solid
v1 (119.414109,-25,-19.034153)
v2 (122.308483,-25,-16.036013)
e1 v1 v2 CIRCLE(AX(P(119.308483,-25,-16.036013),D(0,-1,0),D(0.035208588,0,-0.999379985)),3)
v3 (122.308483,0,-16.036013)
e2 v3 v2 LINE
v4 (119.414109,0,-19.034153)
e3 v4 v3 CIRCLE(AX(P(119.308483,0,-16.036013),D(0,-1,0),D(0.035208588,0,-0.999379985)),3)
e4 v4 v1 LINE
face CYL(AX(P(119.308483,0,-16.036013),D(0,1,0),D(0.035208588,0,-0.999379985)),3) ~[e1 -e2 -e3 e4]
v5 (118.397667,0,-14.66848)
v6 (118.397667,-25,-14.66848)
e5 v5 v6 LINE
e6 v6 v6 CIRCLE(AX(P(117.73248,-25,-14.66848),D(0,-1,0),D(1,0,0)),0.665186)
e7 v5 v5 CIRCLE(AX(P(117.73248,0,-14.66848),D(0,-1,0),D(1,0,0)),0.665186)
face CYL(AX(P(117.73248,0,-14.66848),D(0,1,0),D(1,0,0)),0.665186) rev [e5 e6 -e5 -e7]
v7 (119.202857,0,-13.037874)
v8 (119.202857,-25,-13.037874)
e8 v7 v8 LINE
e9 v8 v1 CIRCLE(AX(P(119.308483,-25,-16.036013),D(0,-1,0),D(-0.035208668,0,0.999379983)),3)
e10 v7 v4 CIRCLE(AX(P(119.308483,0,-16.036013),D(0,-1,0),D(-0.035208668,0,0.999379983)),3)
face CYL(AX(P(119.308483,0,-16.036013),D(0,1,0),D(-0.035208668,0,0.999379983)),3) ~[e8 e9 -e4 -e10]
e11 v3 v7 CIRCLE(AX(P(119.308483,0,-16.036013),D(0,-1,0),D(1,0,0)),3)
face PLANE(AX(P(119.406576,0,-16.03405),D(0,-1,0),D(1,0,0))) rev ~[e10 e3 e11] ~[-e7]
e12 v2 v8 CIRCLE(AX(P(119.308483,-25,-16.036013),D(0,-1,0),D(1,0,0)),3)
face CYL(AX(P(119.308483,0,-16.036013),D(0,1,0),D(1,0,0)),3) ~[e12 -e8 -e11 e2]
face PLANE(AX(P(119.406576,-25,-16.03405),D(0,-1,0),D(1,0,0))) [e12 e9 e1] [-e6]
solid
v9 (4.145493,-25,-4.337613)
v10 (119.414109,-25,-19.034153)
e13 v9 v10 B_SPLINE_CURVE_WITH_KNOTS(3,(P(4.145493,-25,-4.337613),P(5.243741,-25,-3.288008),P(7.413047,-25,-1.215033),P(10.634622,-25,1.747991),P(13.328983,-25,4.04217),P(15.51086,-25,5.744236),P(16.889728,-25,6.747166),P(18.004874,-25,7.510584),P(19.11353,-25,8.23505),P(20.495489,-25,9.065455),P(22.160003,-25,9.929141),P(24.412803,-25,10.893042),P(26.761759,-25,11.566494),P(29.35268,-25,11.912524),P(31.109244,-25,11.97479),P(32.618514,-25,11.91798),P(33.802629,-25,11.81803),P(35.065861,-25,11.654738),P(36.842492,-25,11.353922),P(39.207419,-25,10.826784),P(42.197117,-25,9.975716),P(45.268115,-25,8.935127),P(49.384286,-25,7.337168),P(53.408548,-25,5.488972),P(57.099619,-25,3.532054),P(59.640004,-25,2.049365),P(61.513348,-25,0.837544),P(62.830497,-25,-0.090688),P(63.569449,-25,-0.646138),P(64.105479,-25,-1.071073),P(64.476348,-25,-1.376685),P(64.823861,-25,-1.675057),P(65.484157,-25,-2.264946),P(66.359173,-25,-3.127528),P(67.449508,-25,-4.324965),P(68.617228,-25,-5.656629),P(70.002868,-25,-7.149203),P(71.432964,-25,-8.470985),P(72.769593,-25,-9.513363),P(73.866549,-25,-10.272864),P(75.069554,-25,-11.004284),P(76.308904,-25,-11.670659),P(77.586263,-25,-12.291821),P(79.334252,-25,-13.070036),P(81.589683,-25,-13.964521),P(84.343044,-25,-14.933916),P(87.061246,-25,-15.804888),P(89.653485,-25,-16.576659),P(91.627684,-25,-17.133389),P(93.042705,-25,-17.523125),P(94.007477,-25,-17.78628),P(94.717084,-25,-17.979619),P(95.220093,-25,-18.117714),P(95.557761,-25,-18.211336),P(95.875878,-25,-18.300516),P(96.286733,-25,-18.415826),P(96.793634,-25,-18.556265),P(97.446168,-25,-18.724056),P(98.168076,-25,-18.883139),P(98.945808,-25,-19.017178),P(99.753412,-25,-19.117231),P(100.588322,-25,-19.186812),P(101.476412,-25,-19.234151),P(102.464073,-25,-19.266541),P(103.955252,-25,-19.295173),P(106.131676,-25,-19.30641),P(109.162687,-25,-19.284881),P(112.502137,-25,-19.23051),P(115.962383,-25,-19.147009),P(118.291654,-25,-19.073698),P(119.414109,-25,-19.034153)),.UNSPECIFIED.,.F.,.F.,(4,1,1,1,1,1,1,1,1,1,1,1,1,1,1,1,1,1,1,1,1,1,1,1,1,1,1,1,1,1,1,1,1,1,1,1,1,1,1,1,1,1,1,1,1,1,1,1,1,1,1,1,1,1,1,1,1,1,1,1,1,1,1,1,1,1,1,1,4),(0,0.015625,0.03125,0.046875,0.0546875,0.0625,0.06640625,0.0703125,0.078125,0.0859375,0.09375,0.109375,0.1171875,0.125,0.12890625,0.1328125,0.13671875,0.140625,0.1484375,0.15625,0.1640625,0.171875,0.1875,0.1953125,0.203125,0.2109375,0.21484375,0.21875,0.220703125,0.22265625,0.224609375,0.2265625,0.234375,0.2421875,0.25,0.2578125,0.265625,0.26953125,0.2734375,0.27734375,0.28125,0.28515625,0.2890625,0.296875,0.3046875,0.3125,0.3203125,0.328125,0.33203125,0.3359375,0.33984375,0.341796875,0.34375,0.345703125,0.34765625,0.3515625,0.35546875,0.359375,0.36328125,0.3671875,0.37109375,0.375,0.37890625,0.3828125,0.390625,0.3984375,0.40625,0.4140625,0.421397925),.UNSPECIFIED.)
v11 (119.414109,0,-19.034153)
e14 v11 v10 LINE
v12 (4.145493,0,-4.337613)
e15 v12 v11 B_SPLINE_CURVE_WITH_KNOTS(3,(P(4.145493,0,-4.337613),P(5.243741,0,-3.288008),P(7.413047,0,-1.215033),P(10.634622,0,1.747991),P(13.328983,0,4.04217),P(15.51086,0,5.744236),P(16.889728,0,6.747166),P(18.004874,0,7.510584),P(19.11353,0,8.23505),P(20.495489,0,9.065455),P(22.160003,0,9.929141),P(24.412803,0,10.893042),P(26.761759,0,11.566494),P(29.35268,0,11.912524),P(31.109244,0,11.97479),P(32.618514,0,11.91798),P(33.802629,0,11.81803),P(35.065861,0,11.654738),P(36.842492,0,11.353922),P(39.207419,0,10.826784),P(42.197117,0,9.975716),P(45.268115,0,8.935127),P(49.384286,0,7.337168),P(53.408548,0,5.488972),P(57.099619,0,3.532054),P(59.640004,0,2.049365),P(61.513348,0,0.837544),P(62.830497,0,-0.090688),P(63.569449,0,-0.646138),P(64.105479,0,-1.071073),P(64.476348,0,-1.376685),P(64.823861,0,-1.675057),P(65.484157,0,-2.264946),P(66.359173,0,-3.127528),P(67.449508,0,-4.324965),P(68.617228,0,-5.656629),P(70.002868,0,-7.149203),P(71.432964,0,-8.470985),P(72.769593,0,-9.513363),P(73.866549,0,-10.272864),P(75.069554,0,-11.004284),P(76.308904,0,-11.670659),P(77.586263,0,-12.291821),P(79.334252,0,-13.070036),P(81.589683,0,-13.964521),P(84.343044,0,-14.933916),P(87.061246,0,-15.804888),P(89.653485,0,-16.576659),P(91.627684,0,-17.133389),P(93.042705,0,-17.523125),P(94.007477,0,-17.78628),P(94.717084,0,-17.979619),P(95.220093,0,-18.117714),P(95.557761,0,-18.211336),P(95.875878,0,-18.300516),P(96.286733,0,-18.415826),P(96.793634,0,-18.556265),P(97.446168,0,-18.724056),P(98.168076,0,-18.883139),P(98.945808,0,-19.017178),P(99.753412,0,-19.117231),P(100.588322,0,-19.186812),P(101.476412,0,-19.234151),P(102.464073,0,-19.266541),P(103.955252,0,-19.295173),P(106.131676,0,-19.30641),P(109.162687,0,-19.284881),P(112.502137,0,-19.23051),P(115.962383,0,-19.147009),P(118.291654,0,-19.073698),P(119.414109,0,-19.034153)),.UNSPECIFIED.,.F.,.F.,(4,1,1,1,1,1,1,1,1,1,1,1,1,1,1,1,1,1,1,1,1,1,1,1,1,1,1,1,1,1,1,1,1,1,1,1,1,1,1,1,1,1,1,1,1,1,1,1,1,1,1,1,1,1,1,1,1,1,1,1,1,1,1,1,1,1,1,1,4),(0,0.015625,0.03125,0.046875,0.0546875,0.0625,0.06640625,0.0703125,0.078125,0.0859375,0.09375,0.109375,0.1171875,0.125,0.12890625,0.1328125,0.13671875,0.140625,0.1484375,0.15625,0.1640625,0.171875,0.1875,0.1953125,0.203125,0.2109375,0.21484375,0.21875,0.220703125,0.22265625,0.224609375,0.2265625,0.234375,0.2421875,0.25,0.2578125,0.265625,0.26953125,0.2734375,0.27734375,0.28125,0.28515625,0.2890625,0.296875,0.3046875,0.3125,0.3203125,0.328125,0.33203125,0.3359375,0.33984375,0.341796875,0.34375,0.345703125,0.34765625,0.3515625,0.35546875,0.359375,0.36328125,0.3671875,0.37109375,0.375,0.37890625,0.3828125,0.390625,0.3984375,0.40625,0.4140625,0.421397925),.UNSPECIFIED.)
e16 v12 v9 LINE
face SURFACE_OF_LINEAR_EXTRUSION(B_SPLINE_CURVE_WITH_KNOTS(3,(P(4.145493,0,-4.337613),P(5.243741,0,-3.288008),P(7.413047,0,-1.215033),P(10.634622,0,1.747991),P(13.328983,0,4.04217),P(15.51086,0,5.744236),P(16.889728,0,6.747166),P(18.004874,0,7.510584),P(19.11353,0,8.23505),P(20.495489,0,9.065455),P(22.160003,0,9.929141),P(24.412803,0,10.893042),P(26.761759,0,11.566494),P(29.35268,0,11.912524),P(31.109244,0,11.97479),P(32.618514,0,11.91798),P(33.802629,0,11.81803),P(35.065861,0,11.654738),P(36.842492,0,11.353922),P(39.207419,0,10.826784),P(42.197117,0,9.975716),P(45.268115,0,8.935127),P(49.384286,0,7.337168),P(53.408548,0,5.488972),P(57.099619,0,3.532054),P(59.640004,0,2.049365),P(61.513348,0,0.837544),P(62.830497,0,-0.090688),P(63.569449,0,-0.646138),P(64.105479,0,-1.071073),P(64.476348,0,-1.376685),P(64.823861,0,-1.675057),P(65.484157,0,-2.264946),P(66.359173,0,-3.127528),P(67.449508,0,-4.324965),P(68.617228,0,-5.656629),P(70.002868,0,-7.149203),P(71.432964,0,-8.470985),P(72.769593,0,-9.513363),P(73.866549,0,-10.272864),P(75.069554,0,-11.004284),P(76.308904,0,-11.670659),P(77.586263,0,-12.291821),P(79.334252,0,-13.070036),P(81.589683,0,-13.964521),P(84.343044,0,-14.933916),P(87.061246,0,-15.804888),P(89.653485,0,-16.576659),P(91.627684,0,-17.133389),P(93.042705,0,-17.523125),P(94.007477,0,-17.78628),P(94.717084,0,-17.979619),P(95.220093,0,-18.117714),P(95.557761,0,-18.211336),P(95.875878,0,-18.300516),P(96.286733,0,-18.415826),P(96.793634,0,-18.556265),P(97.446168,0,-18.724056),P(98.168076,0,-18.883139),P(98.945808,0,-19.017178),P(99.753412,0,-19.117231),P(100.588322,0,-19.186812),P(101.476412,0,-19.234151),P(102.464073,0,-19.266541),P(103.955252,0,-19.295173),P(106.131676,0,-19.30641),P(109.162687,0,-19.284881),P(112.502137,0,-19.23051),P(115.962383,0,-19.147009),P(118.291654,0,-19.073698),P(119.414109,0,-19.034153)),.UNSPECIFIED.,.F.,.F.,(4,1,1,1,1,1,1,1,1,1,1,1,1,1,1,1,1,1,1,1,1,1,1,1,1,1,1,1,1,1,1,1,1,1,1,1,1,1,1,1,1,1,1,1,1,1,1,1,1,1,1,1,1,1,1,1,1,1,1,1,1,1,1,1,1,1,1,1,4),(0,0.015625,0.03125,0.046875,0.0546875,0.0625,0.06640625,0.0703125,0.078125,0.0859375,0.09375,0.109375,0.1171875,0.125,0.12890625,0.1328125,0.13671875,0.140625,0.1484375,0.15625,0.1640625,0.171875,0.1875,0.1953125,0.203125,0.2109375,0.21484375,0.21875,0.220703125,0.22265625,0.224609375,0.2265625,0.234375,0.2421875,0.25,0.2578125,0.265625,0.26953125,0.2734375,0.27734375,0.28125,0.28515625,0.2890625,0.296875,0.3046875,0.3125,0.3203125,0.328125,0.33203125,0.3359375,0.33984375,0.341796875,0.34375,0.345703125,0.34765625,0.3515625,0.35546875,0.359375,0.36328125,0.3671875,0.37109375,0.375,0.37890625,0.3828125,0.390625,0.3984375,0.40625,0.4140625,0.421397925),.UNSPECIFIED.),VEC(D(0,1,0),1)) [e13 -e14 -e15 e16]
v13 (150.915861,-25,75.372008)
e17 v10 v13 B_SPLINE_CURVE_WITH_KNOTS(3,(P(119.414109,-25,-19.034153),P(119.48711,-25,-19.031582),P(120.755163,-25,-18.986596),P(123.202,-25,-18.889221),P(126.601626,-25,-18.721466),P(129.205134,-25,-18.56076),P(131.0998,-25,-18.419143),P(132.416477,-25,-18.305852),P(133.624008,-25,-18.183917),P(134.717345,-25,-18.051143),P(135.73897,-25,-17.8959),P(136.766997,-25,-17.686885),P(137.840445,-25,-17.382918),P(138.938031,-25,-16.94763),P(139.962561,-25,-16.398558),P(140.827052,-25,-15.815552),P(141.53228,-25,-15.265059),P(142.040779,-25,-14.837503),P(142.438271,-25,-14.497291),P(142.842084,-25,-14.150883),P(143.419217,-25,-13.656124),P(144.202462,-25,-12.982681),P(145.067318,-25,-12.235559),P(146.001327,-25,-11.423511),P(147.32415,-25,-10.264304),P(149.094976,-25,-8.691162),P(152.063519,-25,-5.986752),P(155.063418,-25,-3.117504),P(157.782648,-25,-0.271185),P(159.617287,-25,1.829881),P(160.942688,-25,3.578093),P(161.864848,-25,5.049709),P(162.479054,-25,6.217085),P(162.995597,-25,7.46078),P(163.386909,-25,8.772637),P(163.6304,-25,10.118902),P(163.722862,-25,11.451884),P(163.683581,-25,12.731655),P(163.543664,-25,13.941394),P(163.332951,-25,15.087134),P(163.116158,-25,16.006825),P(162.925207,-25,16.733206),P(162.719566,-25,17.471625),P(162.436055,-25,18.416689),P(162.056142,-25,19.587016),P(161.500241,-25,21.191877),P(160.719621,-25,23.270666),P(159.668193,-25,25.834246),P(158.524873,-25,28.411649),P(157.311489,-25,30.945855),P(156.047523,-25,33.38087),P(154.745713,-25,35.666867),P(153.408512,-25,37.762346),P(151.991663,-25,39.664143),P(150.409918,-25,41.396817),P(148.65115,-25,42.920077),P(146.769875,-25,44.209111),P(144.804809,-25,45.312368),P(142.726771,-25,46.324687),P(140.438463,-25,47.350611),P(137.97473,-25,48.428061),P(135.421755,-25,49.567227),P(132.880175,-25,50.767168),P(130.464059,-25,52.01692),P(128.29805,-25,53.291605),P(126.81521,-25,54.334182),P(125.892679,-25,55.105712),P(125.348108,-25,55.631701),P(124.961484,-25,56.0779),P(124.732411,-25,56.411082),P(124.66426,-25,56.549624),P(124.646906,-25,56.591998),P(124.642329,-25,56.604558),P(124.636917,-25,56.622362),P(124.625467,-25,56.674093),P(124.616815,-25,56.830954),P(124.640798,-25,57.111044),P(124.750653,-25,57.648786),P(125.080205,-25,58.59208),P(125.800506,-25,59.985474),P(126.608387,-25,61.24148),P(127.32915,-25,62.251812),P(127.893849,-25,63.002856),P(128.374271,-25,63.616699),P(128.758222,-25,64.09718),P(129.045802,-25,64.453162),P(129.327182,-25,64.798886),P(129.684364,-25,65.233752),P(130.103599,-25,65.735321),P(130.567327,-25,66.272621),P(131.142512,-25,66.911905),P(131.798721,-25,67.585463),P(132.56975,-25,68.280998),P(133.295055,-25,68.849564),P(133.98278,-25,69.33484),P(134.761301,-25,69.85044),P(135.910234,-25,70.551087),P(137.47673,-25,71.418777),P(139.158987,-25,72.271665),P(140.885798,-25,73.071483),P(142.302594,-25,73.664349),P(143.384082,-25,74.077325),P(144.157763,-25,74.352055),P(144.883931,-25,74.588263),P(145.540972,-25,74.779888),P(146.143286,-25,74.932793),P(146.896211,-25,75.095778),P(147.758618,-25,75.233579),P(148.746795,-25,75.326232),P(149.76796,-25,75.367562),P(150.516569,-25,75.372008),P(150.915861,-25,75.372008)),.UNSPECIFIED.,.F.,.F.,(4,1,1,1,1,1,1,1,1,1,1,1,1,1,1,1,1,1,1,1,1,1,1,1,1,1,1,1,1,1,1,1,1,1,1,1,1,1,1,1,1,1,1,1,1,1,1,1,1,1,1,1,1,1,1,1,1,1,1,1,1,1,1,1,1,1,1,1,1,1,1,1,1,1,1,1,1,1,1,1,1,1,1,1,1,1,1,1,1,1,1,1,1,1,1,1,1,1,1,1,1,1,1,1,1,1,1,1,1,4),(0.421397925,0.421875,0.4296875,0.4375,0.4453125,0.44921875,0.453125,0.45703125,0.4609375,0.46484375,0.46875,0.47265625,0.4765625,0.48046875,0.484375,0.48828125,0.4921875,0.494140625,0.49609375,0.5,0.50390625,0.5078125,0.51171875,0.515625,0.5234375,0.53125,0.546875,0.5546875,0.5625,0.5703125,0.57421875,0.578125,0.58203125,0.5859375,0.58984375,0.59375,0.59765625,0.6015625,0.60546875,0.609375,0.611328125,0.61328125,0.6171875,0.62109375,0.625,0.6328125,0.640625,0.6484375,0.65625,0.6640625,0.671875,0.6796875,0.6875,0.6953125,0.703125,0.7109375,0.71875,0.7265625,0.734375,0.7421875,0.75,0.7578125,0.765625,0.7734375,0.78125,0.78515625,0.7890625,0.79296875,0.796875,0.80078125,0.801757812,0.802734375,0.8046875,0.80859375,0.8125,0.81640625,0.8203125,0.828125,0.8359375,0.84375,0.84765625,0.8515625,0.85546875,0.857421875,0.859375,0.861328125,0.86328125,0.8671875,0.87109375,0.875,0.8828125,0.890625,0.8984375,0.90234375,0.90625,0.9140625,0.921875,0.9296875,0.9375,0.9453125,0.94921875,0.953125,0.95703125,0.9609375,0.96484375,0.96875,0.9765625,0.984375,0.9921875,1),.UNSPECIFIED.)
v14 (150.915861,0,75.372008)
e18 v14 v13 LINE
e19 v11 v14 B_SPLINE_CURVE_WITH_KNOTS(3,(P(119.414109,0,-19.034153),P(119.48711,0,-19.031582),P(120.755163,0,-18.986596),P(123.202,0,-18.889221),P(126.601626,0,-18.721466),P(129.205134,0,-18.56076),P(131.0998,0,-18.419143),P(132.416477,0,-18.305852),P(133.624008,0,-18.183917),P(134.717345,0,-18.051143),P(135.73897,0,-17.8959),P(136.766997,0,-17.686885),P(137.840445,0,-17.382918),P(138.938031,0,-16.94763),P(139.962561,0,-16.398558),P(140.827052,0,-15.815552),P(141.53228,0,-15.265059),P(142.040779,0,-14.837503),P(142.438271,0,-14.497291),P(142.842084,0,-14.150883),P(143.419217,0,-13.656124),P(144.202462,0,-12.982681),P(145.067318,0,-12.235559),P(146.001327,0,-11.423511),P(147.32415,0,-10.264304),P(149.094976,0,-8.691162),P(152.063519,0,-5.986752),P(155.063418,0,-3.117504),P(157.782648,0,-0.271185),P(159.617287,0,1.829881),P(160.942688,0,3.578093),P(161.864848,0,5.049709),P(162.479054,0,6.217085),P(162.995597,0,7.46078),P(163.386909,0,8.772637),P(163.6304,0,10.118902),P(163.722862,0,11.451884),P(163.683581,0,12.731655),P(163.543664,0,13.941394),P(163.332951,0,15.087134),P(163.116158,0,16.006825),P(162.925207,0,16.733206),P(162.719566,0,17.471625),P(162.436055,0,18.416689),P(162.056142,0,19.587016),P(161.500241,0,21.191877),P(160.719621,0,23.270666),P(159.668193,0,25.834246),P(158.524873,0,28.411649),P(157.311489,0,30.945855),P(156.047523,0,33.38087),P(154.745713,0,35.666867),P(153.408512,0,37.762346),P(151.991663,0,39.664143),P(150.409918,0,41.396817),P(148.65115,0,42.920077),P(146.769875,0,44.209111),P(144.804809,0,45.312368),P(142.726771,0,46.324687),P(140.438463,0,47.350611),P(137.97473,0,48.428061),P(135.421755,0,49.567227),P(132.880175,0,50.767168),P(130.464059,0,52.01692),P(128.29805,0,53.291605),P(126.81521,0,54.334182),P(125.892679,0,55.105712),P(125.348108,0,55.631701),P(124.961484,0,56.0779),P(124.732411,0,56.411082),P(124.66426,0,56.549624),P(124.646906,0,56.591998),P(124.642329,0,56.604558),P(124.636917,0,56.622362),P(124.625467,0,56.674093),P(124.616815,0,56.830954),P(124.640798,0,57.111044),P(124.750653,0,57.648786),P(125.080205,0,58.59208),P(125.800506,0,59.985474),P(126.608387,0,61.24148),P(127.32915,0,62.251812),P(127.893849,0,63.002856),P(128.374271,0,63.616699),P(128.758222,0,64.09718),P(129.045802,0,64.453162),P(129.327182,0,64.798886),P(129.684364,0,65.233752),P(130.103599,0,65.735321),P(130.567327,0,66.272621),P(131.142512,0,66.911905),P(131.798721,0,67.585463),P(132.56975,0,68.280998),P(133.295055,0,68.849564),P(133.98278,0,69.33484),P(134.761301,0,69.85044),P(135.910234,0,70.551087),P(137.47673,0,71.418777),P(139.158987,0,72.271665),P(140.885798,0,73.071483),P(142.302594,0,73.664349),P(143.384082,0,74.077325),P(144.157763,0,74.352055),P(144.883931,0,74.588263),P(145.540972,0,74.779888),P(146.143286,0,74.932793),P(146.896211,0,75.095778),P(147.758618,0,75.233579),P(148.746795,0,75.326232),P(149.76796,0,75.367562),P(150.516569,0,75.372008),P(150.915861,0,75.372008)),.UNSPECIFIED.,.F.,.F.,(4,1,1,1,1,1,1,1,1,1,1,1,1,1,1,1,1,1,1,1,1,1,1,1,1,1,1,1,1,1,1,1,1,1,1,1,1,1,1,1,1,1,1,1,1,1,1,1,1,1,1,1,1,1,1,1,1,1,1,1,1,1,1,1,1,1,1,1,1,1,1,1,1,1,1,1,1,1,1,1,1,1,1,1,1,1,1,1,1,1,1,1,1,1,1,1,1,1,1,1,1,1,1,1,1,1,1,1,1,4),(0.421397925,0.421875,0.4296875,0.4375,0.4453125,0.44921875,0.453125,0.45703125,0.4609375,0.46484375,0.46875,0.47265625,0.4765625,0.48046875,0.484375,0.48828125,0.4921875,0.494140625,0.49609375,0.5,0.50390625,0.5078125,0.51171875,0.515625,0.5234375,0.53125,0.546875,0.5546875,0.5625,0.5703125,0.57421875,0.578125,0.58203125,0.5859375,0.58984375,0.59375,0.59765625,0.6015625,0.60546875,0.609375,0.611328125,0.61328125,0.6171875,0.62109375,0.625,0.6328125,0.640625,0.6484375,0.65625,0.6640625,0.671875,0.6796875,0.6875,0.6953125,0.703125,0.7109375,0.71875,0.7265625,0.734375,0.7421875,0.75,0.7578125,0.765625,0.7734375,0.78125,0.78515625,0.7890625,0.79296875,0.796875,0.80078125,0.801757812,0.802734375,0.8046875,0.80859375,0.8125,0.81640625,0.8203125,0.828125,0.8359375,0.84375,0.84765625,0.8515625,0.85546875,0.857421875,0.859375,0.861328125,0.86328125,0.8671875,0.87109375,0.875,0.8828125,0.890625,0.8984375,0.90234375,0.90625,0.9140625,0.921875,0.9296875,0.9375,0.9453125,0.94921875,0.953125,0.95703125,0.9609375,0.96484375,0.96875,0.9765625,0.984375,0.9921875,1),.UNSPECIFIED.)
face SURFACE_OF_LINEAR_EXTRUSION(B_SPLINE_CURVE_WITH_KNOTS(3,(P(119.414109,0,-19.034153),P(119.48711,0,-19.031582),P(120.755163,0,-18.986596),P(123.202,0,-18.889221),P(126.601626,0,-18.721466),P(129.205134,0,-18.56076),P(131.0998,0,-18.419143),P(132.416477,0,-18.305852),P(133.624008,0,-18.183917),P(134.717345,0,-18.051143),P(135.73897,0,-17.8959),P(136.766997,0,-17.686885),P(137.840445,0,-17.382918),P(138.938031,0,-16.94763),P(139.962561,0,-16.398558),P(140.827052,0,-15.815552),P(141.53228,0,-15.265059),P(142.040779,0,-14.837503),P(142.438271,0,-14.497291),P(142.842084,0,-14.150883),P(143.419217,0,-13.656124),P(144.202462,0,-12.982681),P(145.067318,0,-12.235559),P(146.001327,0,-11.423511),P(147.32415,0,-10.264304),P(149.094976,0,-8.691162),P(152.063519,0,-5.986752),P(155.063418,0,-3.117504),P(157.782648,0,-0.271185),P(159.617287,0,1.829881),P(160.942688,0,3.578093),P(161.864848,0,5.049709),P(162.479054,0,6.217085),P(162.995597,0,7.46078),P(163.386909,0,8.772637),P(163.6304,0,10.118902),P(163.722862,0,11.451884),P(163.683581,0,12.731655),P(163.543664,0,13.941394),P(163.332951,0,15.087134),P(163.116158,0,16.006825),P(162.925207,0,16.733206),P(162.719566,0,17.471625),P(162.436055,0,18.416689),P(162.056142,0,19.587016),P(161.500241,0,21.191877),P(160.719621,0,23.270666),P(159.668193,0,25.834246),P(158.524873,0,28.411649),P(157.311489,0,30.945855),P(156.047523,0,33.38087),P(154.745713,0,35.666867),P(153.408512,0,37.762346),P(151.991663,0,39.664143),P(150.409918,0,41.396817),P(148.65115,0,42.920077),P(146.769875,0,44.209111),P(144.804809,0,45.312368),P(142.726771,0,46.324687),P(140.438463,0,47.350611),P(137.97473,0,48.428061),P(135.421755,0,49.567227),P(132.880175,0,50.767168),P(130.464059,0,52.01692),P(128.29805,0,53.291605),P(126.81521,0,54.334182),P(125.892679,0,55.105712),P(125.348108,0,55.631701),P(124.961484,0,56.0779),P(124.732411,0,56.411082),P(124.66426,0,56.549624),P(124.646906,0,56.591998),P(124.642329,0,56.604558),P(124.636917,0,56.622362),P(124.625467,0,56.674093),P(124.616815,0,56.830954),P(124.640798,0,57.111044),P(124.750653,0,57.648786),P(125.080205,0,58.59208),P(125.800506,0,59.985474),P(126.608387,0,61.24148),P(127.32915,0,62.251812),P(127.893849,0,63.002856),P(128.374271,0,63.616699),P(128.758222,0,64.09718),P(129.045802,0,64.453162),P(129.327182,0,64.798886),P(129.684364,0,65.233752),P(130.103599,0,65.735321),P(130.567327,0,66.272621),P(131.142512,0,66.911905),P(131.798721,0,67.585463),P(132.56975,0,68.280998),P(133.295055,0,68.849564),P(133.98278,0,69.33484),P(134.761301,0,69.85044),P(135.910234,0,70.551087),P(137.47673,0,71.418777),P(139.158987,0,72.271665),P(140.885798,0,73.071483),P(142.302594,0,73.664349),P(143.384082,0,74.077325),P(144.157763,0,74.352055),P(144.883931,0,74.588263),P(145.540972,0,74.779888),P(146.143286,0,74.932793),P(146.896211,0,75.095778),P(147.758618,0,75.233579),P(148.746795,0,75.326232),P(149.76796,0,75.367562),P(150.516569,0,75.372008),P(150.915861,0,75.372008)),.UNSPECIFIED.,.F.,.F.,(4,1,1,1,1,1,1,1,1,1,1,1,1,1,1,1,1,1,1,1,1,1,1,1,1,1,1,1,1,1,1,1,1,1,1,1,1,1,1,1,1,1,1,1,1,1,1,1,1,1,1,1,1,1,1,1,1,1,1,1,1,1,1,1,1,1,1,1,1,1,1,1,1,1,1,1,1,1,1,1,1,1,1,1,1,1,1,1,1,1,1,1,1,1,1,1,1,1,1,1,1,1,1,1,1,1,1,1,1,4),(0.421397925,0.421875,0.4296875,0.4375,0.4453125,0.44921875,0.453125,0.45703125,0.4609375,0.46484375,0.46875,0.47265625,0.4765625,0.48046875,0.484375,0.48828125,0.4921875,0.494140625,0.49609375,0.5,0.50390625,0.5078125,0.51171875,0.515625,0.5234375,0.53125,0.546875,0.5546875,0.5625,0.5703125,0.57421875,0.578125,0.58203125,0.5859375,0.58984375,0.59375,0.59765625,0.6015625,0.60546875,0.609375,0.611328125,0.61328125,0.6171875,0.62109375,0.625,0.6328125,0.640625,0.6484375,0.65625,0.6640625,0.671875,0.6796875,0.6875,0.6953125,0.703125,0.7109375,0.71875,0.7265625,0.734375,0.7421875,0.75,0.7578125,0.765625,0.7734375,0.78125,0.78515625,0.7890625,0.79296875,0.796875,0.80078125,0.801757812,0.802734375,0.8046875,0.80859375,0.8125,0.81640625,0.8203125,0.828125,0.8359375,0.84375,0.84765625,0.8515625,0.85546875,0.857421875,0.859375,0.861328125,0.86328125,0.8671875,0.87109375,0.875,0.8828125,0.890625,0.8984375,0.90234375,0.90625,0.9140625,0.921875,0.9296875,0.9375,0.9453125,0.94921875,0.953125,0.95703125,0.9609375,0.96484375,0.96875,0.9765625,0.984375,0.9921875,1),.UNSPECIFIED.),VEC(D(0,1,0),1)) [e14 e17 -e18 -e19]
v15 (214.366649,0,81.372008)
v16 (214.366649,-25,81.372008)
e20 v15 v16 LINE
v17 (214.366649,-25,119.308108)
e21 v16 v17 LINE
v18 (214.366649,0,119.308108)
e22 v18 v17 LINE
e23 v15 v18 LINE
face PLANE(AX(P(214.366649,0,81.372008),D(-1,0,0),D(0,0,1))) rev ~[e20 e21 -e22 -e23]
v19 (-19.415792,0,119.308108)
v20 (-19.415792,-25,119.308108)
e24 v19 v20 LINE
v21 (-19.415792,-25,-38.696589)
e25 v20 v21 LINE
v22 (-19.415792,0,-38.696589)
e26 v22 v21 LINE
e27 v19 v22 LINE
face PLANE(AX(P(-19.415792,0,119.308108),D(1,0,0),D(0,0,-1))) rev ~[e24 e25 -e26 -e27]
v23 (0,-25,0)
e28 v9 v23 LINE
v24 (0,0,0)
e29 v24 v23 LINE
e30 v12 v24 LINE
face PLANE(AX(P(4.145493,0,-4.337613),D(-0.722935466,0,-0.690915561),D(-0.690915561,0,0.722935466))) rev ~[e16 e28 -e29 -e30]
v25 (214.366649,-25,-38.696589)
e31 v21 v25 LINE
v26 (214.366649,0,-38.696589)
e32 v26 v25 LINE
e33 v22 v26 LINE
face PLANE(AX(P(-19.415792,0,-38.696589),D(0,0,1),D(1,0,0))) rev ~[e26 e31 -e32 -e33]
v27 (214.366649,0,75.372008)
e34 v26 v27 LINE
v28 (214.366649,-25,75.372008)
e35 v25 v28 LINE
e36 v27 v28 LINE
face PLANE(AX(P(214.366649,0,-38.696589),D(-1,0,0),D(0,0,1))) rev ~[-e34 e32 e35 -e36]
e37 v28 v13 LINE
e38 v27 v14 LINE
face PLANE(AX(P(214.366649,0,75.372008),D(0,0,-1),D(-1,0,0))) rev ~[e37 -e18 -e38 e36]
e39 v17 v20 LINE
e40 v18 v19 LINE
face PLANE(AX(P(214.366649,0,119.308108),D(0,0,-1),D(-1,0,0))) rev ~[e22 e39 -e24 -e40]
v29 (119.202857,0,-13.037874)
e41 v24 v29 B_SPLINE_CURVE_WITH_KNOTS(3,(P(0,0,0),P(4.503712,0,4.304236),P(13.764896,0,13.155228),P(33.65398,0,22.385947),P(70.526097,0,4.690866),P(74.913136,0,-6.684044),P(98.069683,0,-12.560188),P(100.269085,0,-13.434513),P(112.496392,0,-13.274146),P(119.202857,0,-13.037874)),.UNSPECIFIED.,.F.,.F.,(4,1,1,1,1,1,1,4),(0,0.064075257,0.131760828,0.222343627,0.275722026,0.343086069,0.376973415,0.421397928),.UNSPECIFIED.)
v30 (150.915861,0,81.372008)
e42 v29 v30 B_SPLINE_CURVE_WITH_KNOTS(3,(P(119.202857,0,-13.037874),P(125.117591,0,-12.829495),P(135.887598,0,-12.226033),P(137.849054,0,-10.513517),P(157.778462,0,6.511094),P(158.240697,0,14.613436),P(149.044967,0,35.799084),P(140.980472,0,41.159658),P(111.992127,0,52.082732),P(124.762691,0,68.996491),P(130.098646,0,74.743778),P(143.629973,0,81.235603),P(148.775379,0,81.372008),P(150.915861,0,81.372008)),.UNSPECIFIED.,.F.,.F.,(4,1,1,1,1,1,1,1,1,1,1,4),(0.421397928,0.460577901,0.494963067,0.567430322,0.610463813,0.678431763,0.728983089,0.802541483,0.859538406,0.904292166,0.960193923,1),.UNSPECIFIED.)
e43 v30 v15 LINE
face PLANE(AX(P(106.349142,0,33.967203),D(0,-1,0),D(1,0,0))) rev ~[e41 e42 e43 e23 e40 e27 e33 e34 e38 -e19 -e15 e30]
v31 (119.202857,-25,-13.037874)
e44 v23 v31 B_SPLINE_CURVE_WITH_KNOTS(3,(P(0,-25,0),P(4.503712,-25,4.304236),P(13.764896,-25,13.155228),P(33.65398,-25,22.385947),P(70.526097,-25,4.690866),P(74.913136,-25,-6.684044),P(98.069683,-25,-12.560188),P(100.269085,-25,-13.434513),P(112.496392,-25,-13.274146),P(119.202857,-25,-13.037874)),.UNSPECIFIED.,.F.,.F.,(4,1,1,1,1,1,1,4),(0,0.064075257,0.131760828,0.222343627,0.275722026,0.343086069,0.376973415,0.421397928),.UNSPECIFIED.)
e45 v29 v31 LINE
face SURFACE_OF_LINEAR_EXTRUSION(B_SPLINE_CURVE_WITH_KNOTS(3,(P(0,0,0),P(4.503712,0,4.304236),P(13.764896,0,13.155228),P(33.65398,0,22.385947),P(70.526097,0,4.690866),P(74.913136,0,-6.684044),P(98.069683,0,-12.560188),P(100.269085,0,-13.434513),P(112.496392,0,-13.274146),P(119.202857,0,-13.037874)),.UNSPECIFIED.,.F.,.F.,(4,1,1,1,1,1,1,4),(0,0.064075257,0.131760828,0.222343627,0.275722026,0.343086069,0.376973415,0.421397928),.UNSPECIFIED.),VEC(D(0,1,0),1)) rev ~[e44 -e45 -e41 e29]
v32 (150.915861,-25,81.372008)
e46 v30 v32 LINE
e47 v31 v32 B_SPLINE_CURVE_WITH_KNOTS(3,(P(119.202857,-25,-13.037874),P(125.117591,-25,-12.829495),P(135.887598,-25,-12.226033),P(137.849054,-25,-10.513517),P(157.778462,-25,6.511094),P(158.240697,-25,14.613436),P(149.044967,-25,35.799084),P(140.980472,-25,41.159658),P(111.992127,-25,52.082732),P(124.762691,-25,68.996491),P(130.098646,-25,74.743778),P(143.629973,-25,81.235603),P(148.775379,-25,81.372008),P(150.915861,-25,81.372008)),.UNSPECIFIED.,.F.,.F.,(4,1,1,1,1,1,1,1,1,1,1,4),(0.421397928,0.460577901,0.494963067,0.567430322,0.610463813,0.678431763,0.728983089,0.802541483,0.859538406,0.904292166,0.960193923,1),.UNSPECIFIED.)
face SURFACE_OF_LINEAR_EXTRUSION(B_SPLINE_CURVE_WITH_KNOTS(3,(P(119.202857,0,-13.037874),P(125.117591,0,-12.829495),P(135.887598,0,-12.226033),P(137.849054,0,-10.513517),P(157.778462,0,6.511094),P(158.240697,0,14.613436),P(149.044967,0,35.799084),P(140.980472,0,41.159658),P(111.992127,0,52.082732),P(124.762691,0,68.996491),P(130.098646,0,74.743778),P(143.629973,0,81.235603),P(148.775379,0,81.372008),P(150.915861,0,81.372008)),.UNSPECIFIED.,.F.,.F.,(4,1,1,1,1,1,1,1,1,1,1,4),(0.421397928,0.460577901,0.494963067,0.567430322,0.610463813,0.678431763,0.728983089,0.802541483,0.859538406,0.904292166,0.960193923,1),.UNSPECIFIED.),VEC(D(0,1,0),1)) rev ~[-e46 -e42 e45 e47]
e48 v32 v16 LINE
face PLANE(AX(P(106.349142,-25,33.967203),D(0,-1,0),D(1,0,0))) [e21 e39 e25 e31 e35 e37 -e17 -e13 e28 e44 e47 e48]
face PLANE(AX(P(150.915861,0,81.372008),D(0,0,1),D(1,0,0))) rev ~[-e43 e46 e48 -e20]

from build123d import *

# Parameters (mm, degrees)
F0_R     = 0.6651863413
F1_DEPTH = 25
F2_DEPTH = 25


# Not quite as in the source:
# - the dataset's text gives a spline's control points without its knots; the knots are read off the source's solid


with BuildPart() as f1:
    # F0 (on Front) → F1 (new body)
    with BuildSketch(Plane.XZ):
        with BuildLine():
            ThreePointArc((122.3084832169, -16.0360134831), (121.3921244993, -13.8776717571), (119.2028572127, -13.0378735352))
            ThreePointArc((119.2028572127, -13.0378735352), (116.3103432648, -16.1416393675), (119.4141089815, -19.0341534395))
            ThreePointArc((119.4141089815, -19.0341534395), (121.4668248597, -18.1196548518), (122.3084832169, -16.0360134831))
        make_face()
        with Locations((117.7324801683, -14.6684795618)):
            Circle(F0_R, mode=Mode.SUBTRACT)
    extrude(amount=F1_DEPTH)


with BuildPart() as f2:
    # F0 (on Front) → F2 (new body)
    with BuildSketch(Plane.XZ):
        with BuildLine():
            Line((4.1454933636, -4.3376127965), (0, 0))
            add(Edge.make_bspline(
                [(0, 0), (4.5037117249, 4.3042355191), (13.7648963192, 13.1552282369), (33.6539795611, 22.3859469816), (70.5260974638, 4.6908661854), (74.9131356895, -6.6840442171), (98.0696827717, -12.5601876128), (100.2690851646, -13.4345128534), (112.4963916518, -13.2741456838), (119.2028572127, -13.0378735352)],
                knots=[0, 0, 0, 0, 0.0640752575, 0.1317608283, 0.2223436266, 0.275722026, 0.3430860694, 0.3769734154, 0.4213979277, 0.4213979277, 0.4213979277, 0.4213979277], degree=3))
            add(Edge.make_bspline(
                [(119.2028572127, -13.0378735352), (125.1175905208, -12.8294945114), (135.8875979213, -12.2260329219), (137.8490544226, -10.5135173732), (157.7784624841, 6.5110943868), (158.2406973488, 14.6134364576), (149.0449665664, 35.7990843084), (140.9804715168, 41.1596578372), (111.9921272876, 52.0827318338), (124.762690675, 68.9964906206), (130.0986463551, 74.7437775542), (143.629972816, 81.2356032201), (148.7753786698, 81.3720077442), (150.9158611298, 81.3720077442)],
                knots=[0.4213979277, 0.4213979277, 0.4213979277, 0.4213979277, 0.4605779012, 0.4949630674, 0.5674303222, 0.6104638131, 0.6784317625, 0.7289830889, 0.802541483, 0.8595384058, 0.9042921665, 0.9601939233, 1, 1, 1, 1], degree=3))
            Line((150.9158611298, 81.3720077442), (214.3666487599, 81.3720077442))
            Line((214.3666487599, 81.3720077442), (214.3666487599, 119.3081084329))
            Line((214.3666487599, 119.3081084329), (-19.4157916641, 119.3081084329))
            Line((-19.4157916641, 119.3081084329), (-19.4157916641, -38.6965889793))
            Line((-19.4157916641, -38.6965889793), (214.3666487599, -38.6965889793))
            Line((214.3666487599, -38.6965889793), (214.3666487599, 75.3720077442))
            Line((214.3666487599, 75.3720077442), (150.9158611298, 75.3720077442))
            add(Edge.make_bspline(
                [(119.4141089799, -19.0341533954), (119.4871101516, -19.0315815327), (120.7551628168, -18.9865960674), (123.2020002243, -18.8892209022), (126.6016258276, -18.721466052), (129.2051336824, -18.5607598165), (131.0997995453, -18.4191431049), (132.4164773871, -18.3058518725), (133.6240077571, -18.1839174375), (134.7173448038, -18.0511427938), (135.7389696275, -17.895900431), (136.7669974316, -17.6868852154), (137.8404453509, -17.3829180115), (138.9380310563, -16.9476296867), (139.9625613283, -16.3985584776), (140.827052172, -15.8155520494), (141.5322803356, -15.2650586357), (142.0407792766, -14.8375029591), (142.438270563, -14.4972905878), (142.8420836155, -14.1508828396), (143.4192170697, -13.6561238308), (144.2024620522, -12.9826805066), (145.0673181917, -12.2355593157), (146.0013266265, -11.4235107422), (147.3241496876, -10.264303774), (149.0949763641, -8.691161638), (152.0635187163, -5.9867519033), (155.0634175663, -3.1175042059), (157.7826477848, -0.2711852119), (159.6172871117, 1.82988094), (160.9426876994, 3.578092876), (161.864848372, 5.0497093246), (162.4790539519, 6.2170852342), (162.9955971863, 7.4607803665), (163.386908628, 8.7726369645), (163.6303999393, 10.1189016964), (163.7228618743, 11.4518844469), (163.6835814445, 12.7316548024), (163.5436641961, 13.9413942325), (163.3329510954, 15.0871340521), (163.1161576384, 16.0068254114), (162.9252065829, 16.7332056778), (162.7195664026, 17.4716247723), (162.4360551739, 18.4166894366), (162.0561419501, 19.5870161779), (161.5002405625, 21.1918771935), (160.7196210908, 23.2706662014), (159.6681934008, 25.8342458833), (158.5248729578, 28.4116494335), (157.3114889212, 30.9458554347), (156.0475232975, 33.3808697793), (154.7457132627, 35.6668674836), (153.4085117355, 37.7623461903), (151.991662503, 39.6641433162), (150.4099177475, 41.3968167785), (148.6511497108, 42.9200771006), (146.7698746062, 44.209111144), (144.8048090764, 45.3123675275), (142.7267705238, 46.3246869099), (140.438462858, 47.3506114125), (137.9747297964, 48.4280612839), (135.4217548209, 49.5672266744), (132.8801749016, 50.7671681076), (130.464059114, 52.0169199809), (128.298049606, 53.2916050203), (126.8152096984, 54.3341822007), (125.8926787851, 55.1057116143), (125.3481084384, 55.6317010892), (124.9614837204, 56.0779002187), (124.7324111989, 56.4110817064), (124.6642598762, 56.5496236369), (124.6469062848, 56.5919977881), (124.6423285594, 56.604558201), (124.6369168484, 56.6223618588), (124.6254672346, 56.6740931465), (124.6168148585, 56.8309541668), (124.6407980996, 57.1110436646), (124.7506534781, 57.6487861525), (125.0802050729, 58.5920803636), (125.8005058034, 59.9854736022), (126.6083870109, 61.2414798545), (127.3291502197, 62.2518120274), (127.8938491077, 63.0028563289), (128.3742714561, 63.6166989958), (128.7582219627, 64.0971795957), (129.0458019743, 64.453161697), (129.3271818406, 64.7988859857), (129.6843642656, 65.2337517538), (130.1035993611, 65.735320869), (130.567326874, 66.2726212921), (131.1425124055, 66.9119050208), (131.7987212915, 67.5854626234), (132.5697497197, 68.2809981123), (133.2950551065, 68.8495639596), (133.9827804314, 69.3348396315), (134.7613012396, 69.8504399686), (135.9102342215, 70.5510874997), (137.4767302693, 71.4187773785), (139.1589871979, 72.2716649361), (140.8857983187, 73.0714834042), (142.302594056, 73.6643488492), (143.3840824883, 74.0773252687), (144.1577631499, 74.3520546179), (144.8839306759, 74.5882634106), (145.540971774, 74.7798881974), (146.1432863223, 74.9327931307), (146.8962108192, 75.095777904), (147.758617804, 75.2335789325), (148.7467949394, 75.3262316993), (149.7679595331, 75.3675621745), (150.5165689591, 75.3720077442), (150.9158611298, 75.3720077442)],
                knots=[0.4213979254, 0.4213979254, 0.4213979254, 0.4213979254, 0.421875, 0.4296875, 0.4375, 0.4453125, 0.44921875, 0.453125, 0.45703125, 0.4609375, 0.46484375, 0.46875, 0.47265625, 0.4765625, 0.48046875, 0.484375, 0.48828125, 0.4921875, 0.494140625, 0.49609375, 0.5, 0.50390625, 0.5078125, 0.51171875, 0.515625, 0.5234375, 0.53125, 0.546875, 0.5546875, 0.5625, 0.5703125, 0.57421875, 0.578125, 0.58203125, 0.5859375, 0.58984375, 0.59375, 0.59765625, 0.6015625, 0.60546875, 0.609375, 0.611328125, 0.61328125, 0.6171875, 0.62109375, 0.625, 0.6328125, 0.640625, 0.6484375, 0.65625, 0.6640625, 0.671875, 0.6796875, 0.6875, 0.6953125, 0.703125, 0.7109375, 0.71875, 0.7265625, 0.734375, 0.7421875, 0.75, 0.7578125, 0.765625, 0.7734375, 0.78125, 0.78515625, 0.7890625, 0.79296875, 0.796875, 0.80078125, 0.8017578125, 0.802734375, 0.8046875, 0.80859375, 0.8125, 0.81640625, 0.8203125, 0.828125, 0.8359375, 0.84375, 0.84765625, 0.8515625, 0.85546875, 0.857421875, 0.859375, 0.861328125, 0.86328125, 0.8671875, 0.87109375, 0.875, 0.8828125, 0.890625, 0.8984375, 0.90234375, 0.90625, 0.9140625, 0.921875, 0.9296875, 0.9375, 0.9453125, 0.94921875, 0.953125, 0.95703125, 0.9609375, 0.96484375, 0.96875, 0.9765625, 0.984375, 0.9921875, 1, 1, 1, 1], degree=3))
            add(Edge.make_bspline(
                [(4.1454933636, -4.3376127965), (5.2437409318, -3.2880082746), (7.4130473658, -1.2150332588), (10.6346217395, 1.7479905226), (13.328983039, 4.0421704542), (15.5108600534, 5.7442358048), (16.8897277858, 6.7471664464), (18.0048744149, 7.5105836164), (19.1135300455, 8.2350503066), (20.4954893224, 9.0654553771), (22.1600034365, 9.9291412323), (24.4128030564, 10.8930416102), (26.7617592156, 11.5664937426), (29.3526802049, 11.9125235338), (31.1092438153, 11.9747900048), (32.6185135441, 11.9179799387), (33.8026291591, 11.8180300331), (35.0658605885, 11.6547378195), (36.8424919842, 11.3539219674), (39.2074188038, 10.826783948), (42.1971171925, 9.9757162304), (45.2681150661, 8.9351274998), (49.3842856633, 7.3371678916), (53.4085483139, 5.4889718545), (57.099619297, 3.5320540573), (59.640004233, 2.0493646835), (61.5133475968, 0.8375436531), (62.8304971794, -0.0906884738), (63.5694491508, -0.6461378338), (64.1054790166, -1.0710734595), (64.4763479102, -1.3766847661), (64.8238613096, -1.6750569086), (65.4841566064, -2.2649459105), (66.359173463, -3.1275277083), (67.4495081459, -4.3249654744), (68.617227829, -5.6566289331), (70.0028678673, -7.1492026464), (71.4329639416, -8.4709854063), (72.7695929433, -9.5133625191), (73.8665488203, -10.2728637672), (75.0695535726, -11.004284465), (76.3089036908, -11.6706590346), (77.586262972, -12.2918209894), (79.3342523936, -13.0700358574), (81.5896831926, -13.9645213472), (84.3430443861, -14.9339157819), (87.061245605, -15.8048884282), (89.6534851435, -16.5766586066), (91.6276841961, -17.1333894197), (93.0427049791, -17.5231249068), (94.0074769688, -17.7862802292), (94.7170841431, -17.9796187266), (95.2200929153, -18.1177136158), (95.5577608478, -18.2113357528), (95.8758779604, -18.3005162078), (96.2867325524, -18.4158262689), (96.7936336212, -18.5562645933), (97.4461681933, -18.7240555173), (98.1680763275, -18.8831391308), (98.945808312, -19.0171782937), (99.7534121549, -19.1172310279), (100.5883223202, -19.186811534), (101.4764122205, -19.2341514561), (102.464072553, -19.2665411051), (103.9552517431, -19.2951732767), (106.1316755542, -19.3064098066), (109.1626871747, -19.2848806165), (112.5021370915, -19.2305099516), (115.9623834061, -19.1470091318), (118.2916543284, -19.0736979571), (119.4141089799, -19.0341533954)],
                knots=[0, 0, 0, 0, 0.015625, 0.03125, 0.046875, 0.0546875, 0.0625, 0.06640625, 0.0703125, 0.078125, 0.0859375, 0.09375, 0.109375, 0.1171875, 0.125, 0.12890625, 0.1328125, 0.13671875, 0.140625, 0.1484375, 0.15625, 0.1640625, 0.171875, 0.1875, 0.1953125, 0.203125, 0.2109375, 0.21484375, 0.21875, 0.220703125, 0.22265625, 0.224609375, 0.2265625, 0.234375, 0.2421875, 0.25, 0.2578125, 0.265625, 0.26953125, 0.2734375, 0.27734375, 0.28125, 0.28515625, 0.2890625, 0.296875, 0.3046875, 0.3125, 0.3203125, 0.328125, 0.33203125, 0.3359375, 0.33984375, 0.341796875, 0.34375, 0.345703125, 0.34765625, 0.3515625, 0.35546875, 0.359375, 0.36328125, 0.3671875, 0.37109375, 0.375, 0.37890625, 0.3828125, 0.390625, 0.3984375, 0.40625, 0.4140625, 0.4213979254, 0.4213979254, 0.4213979254, 0.4213979254], degree=3))
        make_face()
    extrude(amount=F2_DEPTH)


solid = Compound([f1.part, f2.part])
